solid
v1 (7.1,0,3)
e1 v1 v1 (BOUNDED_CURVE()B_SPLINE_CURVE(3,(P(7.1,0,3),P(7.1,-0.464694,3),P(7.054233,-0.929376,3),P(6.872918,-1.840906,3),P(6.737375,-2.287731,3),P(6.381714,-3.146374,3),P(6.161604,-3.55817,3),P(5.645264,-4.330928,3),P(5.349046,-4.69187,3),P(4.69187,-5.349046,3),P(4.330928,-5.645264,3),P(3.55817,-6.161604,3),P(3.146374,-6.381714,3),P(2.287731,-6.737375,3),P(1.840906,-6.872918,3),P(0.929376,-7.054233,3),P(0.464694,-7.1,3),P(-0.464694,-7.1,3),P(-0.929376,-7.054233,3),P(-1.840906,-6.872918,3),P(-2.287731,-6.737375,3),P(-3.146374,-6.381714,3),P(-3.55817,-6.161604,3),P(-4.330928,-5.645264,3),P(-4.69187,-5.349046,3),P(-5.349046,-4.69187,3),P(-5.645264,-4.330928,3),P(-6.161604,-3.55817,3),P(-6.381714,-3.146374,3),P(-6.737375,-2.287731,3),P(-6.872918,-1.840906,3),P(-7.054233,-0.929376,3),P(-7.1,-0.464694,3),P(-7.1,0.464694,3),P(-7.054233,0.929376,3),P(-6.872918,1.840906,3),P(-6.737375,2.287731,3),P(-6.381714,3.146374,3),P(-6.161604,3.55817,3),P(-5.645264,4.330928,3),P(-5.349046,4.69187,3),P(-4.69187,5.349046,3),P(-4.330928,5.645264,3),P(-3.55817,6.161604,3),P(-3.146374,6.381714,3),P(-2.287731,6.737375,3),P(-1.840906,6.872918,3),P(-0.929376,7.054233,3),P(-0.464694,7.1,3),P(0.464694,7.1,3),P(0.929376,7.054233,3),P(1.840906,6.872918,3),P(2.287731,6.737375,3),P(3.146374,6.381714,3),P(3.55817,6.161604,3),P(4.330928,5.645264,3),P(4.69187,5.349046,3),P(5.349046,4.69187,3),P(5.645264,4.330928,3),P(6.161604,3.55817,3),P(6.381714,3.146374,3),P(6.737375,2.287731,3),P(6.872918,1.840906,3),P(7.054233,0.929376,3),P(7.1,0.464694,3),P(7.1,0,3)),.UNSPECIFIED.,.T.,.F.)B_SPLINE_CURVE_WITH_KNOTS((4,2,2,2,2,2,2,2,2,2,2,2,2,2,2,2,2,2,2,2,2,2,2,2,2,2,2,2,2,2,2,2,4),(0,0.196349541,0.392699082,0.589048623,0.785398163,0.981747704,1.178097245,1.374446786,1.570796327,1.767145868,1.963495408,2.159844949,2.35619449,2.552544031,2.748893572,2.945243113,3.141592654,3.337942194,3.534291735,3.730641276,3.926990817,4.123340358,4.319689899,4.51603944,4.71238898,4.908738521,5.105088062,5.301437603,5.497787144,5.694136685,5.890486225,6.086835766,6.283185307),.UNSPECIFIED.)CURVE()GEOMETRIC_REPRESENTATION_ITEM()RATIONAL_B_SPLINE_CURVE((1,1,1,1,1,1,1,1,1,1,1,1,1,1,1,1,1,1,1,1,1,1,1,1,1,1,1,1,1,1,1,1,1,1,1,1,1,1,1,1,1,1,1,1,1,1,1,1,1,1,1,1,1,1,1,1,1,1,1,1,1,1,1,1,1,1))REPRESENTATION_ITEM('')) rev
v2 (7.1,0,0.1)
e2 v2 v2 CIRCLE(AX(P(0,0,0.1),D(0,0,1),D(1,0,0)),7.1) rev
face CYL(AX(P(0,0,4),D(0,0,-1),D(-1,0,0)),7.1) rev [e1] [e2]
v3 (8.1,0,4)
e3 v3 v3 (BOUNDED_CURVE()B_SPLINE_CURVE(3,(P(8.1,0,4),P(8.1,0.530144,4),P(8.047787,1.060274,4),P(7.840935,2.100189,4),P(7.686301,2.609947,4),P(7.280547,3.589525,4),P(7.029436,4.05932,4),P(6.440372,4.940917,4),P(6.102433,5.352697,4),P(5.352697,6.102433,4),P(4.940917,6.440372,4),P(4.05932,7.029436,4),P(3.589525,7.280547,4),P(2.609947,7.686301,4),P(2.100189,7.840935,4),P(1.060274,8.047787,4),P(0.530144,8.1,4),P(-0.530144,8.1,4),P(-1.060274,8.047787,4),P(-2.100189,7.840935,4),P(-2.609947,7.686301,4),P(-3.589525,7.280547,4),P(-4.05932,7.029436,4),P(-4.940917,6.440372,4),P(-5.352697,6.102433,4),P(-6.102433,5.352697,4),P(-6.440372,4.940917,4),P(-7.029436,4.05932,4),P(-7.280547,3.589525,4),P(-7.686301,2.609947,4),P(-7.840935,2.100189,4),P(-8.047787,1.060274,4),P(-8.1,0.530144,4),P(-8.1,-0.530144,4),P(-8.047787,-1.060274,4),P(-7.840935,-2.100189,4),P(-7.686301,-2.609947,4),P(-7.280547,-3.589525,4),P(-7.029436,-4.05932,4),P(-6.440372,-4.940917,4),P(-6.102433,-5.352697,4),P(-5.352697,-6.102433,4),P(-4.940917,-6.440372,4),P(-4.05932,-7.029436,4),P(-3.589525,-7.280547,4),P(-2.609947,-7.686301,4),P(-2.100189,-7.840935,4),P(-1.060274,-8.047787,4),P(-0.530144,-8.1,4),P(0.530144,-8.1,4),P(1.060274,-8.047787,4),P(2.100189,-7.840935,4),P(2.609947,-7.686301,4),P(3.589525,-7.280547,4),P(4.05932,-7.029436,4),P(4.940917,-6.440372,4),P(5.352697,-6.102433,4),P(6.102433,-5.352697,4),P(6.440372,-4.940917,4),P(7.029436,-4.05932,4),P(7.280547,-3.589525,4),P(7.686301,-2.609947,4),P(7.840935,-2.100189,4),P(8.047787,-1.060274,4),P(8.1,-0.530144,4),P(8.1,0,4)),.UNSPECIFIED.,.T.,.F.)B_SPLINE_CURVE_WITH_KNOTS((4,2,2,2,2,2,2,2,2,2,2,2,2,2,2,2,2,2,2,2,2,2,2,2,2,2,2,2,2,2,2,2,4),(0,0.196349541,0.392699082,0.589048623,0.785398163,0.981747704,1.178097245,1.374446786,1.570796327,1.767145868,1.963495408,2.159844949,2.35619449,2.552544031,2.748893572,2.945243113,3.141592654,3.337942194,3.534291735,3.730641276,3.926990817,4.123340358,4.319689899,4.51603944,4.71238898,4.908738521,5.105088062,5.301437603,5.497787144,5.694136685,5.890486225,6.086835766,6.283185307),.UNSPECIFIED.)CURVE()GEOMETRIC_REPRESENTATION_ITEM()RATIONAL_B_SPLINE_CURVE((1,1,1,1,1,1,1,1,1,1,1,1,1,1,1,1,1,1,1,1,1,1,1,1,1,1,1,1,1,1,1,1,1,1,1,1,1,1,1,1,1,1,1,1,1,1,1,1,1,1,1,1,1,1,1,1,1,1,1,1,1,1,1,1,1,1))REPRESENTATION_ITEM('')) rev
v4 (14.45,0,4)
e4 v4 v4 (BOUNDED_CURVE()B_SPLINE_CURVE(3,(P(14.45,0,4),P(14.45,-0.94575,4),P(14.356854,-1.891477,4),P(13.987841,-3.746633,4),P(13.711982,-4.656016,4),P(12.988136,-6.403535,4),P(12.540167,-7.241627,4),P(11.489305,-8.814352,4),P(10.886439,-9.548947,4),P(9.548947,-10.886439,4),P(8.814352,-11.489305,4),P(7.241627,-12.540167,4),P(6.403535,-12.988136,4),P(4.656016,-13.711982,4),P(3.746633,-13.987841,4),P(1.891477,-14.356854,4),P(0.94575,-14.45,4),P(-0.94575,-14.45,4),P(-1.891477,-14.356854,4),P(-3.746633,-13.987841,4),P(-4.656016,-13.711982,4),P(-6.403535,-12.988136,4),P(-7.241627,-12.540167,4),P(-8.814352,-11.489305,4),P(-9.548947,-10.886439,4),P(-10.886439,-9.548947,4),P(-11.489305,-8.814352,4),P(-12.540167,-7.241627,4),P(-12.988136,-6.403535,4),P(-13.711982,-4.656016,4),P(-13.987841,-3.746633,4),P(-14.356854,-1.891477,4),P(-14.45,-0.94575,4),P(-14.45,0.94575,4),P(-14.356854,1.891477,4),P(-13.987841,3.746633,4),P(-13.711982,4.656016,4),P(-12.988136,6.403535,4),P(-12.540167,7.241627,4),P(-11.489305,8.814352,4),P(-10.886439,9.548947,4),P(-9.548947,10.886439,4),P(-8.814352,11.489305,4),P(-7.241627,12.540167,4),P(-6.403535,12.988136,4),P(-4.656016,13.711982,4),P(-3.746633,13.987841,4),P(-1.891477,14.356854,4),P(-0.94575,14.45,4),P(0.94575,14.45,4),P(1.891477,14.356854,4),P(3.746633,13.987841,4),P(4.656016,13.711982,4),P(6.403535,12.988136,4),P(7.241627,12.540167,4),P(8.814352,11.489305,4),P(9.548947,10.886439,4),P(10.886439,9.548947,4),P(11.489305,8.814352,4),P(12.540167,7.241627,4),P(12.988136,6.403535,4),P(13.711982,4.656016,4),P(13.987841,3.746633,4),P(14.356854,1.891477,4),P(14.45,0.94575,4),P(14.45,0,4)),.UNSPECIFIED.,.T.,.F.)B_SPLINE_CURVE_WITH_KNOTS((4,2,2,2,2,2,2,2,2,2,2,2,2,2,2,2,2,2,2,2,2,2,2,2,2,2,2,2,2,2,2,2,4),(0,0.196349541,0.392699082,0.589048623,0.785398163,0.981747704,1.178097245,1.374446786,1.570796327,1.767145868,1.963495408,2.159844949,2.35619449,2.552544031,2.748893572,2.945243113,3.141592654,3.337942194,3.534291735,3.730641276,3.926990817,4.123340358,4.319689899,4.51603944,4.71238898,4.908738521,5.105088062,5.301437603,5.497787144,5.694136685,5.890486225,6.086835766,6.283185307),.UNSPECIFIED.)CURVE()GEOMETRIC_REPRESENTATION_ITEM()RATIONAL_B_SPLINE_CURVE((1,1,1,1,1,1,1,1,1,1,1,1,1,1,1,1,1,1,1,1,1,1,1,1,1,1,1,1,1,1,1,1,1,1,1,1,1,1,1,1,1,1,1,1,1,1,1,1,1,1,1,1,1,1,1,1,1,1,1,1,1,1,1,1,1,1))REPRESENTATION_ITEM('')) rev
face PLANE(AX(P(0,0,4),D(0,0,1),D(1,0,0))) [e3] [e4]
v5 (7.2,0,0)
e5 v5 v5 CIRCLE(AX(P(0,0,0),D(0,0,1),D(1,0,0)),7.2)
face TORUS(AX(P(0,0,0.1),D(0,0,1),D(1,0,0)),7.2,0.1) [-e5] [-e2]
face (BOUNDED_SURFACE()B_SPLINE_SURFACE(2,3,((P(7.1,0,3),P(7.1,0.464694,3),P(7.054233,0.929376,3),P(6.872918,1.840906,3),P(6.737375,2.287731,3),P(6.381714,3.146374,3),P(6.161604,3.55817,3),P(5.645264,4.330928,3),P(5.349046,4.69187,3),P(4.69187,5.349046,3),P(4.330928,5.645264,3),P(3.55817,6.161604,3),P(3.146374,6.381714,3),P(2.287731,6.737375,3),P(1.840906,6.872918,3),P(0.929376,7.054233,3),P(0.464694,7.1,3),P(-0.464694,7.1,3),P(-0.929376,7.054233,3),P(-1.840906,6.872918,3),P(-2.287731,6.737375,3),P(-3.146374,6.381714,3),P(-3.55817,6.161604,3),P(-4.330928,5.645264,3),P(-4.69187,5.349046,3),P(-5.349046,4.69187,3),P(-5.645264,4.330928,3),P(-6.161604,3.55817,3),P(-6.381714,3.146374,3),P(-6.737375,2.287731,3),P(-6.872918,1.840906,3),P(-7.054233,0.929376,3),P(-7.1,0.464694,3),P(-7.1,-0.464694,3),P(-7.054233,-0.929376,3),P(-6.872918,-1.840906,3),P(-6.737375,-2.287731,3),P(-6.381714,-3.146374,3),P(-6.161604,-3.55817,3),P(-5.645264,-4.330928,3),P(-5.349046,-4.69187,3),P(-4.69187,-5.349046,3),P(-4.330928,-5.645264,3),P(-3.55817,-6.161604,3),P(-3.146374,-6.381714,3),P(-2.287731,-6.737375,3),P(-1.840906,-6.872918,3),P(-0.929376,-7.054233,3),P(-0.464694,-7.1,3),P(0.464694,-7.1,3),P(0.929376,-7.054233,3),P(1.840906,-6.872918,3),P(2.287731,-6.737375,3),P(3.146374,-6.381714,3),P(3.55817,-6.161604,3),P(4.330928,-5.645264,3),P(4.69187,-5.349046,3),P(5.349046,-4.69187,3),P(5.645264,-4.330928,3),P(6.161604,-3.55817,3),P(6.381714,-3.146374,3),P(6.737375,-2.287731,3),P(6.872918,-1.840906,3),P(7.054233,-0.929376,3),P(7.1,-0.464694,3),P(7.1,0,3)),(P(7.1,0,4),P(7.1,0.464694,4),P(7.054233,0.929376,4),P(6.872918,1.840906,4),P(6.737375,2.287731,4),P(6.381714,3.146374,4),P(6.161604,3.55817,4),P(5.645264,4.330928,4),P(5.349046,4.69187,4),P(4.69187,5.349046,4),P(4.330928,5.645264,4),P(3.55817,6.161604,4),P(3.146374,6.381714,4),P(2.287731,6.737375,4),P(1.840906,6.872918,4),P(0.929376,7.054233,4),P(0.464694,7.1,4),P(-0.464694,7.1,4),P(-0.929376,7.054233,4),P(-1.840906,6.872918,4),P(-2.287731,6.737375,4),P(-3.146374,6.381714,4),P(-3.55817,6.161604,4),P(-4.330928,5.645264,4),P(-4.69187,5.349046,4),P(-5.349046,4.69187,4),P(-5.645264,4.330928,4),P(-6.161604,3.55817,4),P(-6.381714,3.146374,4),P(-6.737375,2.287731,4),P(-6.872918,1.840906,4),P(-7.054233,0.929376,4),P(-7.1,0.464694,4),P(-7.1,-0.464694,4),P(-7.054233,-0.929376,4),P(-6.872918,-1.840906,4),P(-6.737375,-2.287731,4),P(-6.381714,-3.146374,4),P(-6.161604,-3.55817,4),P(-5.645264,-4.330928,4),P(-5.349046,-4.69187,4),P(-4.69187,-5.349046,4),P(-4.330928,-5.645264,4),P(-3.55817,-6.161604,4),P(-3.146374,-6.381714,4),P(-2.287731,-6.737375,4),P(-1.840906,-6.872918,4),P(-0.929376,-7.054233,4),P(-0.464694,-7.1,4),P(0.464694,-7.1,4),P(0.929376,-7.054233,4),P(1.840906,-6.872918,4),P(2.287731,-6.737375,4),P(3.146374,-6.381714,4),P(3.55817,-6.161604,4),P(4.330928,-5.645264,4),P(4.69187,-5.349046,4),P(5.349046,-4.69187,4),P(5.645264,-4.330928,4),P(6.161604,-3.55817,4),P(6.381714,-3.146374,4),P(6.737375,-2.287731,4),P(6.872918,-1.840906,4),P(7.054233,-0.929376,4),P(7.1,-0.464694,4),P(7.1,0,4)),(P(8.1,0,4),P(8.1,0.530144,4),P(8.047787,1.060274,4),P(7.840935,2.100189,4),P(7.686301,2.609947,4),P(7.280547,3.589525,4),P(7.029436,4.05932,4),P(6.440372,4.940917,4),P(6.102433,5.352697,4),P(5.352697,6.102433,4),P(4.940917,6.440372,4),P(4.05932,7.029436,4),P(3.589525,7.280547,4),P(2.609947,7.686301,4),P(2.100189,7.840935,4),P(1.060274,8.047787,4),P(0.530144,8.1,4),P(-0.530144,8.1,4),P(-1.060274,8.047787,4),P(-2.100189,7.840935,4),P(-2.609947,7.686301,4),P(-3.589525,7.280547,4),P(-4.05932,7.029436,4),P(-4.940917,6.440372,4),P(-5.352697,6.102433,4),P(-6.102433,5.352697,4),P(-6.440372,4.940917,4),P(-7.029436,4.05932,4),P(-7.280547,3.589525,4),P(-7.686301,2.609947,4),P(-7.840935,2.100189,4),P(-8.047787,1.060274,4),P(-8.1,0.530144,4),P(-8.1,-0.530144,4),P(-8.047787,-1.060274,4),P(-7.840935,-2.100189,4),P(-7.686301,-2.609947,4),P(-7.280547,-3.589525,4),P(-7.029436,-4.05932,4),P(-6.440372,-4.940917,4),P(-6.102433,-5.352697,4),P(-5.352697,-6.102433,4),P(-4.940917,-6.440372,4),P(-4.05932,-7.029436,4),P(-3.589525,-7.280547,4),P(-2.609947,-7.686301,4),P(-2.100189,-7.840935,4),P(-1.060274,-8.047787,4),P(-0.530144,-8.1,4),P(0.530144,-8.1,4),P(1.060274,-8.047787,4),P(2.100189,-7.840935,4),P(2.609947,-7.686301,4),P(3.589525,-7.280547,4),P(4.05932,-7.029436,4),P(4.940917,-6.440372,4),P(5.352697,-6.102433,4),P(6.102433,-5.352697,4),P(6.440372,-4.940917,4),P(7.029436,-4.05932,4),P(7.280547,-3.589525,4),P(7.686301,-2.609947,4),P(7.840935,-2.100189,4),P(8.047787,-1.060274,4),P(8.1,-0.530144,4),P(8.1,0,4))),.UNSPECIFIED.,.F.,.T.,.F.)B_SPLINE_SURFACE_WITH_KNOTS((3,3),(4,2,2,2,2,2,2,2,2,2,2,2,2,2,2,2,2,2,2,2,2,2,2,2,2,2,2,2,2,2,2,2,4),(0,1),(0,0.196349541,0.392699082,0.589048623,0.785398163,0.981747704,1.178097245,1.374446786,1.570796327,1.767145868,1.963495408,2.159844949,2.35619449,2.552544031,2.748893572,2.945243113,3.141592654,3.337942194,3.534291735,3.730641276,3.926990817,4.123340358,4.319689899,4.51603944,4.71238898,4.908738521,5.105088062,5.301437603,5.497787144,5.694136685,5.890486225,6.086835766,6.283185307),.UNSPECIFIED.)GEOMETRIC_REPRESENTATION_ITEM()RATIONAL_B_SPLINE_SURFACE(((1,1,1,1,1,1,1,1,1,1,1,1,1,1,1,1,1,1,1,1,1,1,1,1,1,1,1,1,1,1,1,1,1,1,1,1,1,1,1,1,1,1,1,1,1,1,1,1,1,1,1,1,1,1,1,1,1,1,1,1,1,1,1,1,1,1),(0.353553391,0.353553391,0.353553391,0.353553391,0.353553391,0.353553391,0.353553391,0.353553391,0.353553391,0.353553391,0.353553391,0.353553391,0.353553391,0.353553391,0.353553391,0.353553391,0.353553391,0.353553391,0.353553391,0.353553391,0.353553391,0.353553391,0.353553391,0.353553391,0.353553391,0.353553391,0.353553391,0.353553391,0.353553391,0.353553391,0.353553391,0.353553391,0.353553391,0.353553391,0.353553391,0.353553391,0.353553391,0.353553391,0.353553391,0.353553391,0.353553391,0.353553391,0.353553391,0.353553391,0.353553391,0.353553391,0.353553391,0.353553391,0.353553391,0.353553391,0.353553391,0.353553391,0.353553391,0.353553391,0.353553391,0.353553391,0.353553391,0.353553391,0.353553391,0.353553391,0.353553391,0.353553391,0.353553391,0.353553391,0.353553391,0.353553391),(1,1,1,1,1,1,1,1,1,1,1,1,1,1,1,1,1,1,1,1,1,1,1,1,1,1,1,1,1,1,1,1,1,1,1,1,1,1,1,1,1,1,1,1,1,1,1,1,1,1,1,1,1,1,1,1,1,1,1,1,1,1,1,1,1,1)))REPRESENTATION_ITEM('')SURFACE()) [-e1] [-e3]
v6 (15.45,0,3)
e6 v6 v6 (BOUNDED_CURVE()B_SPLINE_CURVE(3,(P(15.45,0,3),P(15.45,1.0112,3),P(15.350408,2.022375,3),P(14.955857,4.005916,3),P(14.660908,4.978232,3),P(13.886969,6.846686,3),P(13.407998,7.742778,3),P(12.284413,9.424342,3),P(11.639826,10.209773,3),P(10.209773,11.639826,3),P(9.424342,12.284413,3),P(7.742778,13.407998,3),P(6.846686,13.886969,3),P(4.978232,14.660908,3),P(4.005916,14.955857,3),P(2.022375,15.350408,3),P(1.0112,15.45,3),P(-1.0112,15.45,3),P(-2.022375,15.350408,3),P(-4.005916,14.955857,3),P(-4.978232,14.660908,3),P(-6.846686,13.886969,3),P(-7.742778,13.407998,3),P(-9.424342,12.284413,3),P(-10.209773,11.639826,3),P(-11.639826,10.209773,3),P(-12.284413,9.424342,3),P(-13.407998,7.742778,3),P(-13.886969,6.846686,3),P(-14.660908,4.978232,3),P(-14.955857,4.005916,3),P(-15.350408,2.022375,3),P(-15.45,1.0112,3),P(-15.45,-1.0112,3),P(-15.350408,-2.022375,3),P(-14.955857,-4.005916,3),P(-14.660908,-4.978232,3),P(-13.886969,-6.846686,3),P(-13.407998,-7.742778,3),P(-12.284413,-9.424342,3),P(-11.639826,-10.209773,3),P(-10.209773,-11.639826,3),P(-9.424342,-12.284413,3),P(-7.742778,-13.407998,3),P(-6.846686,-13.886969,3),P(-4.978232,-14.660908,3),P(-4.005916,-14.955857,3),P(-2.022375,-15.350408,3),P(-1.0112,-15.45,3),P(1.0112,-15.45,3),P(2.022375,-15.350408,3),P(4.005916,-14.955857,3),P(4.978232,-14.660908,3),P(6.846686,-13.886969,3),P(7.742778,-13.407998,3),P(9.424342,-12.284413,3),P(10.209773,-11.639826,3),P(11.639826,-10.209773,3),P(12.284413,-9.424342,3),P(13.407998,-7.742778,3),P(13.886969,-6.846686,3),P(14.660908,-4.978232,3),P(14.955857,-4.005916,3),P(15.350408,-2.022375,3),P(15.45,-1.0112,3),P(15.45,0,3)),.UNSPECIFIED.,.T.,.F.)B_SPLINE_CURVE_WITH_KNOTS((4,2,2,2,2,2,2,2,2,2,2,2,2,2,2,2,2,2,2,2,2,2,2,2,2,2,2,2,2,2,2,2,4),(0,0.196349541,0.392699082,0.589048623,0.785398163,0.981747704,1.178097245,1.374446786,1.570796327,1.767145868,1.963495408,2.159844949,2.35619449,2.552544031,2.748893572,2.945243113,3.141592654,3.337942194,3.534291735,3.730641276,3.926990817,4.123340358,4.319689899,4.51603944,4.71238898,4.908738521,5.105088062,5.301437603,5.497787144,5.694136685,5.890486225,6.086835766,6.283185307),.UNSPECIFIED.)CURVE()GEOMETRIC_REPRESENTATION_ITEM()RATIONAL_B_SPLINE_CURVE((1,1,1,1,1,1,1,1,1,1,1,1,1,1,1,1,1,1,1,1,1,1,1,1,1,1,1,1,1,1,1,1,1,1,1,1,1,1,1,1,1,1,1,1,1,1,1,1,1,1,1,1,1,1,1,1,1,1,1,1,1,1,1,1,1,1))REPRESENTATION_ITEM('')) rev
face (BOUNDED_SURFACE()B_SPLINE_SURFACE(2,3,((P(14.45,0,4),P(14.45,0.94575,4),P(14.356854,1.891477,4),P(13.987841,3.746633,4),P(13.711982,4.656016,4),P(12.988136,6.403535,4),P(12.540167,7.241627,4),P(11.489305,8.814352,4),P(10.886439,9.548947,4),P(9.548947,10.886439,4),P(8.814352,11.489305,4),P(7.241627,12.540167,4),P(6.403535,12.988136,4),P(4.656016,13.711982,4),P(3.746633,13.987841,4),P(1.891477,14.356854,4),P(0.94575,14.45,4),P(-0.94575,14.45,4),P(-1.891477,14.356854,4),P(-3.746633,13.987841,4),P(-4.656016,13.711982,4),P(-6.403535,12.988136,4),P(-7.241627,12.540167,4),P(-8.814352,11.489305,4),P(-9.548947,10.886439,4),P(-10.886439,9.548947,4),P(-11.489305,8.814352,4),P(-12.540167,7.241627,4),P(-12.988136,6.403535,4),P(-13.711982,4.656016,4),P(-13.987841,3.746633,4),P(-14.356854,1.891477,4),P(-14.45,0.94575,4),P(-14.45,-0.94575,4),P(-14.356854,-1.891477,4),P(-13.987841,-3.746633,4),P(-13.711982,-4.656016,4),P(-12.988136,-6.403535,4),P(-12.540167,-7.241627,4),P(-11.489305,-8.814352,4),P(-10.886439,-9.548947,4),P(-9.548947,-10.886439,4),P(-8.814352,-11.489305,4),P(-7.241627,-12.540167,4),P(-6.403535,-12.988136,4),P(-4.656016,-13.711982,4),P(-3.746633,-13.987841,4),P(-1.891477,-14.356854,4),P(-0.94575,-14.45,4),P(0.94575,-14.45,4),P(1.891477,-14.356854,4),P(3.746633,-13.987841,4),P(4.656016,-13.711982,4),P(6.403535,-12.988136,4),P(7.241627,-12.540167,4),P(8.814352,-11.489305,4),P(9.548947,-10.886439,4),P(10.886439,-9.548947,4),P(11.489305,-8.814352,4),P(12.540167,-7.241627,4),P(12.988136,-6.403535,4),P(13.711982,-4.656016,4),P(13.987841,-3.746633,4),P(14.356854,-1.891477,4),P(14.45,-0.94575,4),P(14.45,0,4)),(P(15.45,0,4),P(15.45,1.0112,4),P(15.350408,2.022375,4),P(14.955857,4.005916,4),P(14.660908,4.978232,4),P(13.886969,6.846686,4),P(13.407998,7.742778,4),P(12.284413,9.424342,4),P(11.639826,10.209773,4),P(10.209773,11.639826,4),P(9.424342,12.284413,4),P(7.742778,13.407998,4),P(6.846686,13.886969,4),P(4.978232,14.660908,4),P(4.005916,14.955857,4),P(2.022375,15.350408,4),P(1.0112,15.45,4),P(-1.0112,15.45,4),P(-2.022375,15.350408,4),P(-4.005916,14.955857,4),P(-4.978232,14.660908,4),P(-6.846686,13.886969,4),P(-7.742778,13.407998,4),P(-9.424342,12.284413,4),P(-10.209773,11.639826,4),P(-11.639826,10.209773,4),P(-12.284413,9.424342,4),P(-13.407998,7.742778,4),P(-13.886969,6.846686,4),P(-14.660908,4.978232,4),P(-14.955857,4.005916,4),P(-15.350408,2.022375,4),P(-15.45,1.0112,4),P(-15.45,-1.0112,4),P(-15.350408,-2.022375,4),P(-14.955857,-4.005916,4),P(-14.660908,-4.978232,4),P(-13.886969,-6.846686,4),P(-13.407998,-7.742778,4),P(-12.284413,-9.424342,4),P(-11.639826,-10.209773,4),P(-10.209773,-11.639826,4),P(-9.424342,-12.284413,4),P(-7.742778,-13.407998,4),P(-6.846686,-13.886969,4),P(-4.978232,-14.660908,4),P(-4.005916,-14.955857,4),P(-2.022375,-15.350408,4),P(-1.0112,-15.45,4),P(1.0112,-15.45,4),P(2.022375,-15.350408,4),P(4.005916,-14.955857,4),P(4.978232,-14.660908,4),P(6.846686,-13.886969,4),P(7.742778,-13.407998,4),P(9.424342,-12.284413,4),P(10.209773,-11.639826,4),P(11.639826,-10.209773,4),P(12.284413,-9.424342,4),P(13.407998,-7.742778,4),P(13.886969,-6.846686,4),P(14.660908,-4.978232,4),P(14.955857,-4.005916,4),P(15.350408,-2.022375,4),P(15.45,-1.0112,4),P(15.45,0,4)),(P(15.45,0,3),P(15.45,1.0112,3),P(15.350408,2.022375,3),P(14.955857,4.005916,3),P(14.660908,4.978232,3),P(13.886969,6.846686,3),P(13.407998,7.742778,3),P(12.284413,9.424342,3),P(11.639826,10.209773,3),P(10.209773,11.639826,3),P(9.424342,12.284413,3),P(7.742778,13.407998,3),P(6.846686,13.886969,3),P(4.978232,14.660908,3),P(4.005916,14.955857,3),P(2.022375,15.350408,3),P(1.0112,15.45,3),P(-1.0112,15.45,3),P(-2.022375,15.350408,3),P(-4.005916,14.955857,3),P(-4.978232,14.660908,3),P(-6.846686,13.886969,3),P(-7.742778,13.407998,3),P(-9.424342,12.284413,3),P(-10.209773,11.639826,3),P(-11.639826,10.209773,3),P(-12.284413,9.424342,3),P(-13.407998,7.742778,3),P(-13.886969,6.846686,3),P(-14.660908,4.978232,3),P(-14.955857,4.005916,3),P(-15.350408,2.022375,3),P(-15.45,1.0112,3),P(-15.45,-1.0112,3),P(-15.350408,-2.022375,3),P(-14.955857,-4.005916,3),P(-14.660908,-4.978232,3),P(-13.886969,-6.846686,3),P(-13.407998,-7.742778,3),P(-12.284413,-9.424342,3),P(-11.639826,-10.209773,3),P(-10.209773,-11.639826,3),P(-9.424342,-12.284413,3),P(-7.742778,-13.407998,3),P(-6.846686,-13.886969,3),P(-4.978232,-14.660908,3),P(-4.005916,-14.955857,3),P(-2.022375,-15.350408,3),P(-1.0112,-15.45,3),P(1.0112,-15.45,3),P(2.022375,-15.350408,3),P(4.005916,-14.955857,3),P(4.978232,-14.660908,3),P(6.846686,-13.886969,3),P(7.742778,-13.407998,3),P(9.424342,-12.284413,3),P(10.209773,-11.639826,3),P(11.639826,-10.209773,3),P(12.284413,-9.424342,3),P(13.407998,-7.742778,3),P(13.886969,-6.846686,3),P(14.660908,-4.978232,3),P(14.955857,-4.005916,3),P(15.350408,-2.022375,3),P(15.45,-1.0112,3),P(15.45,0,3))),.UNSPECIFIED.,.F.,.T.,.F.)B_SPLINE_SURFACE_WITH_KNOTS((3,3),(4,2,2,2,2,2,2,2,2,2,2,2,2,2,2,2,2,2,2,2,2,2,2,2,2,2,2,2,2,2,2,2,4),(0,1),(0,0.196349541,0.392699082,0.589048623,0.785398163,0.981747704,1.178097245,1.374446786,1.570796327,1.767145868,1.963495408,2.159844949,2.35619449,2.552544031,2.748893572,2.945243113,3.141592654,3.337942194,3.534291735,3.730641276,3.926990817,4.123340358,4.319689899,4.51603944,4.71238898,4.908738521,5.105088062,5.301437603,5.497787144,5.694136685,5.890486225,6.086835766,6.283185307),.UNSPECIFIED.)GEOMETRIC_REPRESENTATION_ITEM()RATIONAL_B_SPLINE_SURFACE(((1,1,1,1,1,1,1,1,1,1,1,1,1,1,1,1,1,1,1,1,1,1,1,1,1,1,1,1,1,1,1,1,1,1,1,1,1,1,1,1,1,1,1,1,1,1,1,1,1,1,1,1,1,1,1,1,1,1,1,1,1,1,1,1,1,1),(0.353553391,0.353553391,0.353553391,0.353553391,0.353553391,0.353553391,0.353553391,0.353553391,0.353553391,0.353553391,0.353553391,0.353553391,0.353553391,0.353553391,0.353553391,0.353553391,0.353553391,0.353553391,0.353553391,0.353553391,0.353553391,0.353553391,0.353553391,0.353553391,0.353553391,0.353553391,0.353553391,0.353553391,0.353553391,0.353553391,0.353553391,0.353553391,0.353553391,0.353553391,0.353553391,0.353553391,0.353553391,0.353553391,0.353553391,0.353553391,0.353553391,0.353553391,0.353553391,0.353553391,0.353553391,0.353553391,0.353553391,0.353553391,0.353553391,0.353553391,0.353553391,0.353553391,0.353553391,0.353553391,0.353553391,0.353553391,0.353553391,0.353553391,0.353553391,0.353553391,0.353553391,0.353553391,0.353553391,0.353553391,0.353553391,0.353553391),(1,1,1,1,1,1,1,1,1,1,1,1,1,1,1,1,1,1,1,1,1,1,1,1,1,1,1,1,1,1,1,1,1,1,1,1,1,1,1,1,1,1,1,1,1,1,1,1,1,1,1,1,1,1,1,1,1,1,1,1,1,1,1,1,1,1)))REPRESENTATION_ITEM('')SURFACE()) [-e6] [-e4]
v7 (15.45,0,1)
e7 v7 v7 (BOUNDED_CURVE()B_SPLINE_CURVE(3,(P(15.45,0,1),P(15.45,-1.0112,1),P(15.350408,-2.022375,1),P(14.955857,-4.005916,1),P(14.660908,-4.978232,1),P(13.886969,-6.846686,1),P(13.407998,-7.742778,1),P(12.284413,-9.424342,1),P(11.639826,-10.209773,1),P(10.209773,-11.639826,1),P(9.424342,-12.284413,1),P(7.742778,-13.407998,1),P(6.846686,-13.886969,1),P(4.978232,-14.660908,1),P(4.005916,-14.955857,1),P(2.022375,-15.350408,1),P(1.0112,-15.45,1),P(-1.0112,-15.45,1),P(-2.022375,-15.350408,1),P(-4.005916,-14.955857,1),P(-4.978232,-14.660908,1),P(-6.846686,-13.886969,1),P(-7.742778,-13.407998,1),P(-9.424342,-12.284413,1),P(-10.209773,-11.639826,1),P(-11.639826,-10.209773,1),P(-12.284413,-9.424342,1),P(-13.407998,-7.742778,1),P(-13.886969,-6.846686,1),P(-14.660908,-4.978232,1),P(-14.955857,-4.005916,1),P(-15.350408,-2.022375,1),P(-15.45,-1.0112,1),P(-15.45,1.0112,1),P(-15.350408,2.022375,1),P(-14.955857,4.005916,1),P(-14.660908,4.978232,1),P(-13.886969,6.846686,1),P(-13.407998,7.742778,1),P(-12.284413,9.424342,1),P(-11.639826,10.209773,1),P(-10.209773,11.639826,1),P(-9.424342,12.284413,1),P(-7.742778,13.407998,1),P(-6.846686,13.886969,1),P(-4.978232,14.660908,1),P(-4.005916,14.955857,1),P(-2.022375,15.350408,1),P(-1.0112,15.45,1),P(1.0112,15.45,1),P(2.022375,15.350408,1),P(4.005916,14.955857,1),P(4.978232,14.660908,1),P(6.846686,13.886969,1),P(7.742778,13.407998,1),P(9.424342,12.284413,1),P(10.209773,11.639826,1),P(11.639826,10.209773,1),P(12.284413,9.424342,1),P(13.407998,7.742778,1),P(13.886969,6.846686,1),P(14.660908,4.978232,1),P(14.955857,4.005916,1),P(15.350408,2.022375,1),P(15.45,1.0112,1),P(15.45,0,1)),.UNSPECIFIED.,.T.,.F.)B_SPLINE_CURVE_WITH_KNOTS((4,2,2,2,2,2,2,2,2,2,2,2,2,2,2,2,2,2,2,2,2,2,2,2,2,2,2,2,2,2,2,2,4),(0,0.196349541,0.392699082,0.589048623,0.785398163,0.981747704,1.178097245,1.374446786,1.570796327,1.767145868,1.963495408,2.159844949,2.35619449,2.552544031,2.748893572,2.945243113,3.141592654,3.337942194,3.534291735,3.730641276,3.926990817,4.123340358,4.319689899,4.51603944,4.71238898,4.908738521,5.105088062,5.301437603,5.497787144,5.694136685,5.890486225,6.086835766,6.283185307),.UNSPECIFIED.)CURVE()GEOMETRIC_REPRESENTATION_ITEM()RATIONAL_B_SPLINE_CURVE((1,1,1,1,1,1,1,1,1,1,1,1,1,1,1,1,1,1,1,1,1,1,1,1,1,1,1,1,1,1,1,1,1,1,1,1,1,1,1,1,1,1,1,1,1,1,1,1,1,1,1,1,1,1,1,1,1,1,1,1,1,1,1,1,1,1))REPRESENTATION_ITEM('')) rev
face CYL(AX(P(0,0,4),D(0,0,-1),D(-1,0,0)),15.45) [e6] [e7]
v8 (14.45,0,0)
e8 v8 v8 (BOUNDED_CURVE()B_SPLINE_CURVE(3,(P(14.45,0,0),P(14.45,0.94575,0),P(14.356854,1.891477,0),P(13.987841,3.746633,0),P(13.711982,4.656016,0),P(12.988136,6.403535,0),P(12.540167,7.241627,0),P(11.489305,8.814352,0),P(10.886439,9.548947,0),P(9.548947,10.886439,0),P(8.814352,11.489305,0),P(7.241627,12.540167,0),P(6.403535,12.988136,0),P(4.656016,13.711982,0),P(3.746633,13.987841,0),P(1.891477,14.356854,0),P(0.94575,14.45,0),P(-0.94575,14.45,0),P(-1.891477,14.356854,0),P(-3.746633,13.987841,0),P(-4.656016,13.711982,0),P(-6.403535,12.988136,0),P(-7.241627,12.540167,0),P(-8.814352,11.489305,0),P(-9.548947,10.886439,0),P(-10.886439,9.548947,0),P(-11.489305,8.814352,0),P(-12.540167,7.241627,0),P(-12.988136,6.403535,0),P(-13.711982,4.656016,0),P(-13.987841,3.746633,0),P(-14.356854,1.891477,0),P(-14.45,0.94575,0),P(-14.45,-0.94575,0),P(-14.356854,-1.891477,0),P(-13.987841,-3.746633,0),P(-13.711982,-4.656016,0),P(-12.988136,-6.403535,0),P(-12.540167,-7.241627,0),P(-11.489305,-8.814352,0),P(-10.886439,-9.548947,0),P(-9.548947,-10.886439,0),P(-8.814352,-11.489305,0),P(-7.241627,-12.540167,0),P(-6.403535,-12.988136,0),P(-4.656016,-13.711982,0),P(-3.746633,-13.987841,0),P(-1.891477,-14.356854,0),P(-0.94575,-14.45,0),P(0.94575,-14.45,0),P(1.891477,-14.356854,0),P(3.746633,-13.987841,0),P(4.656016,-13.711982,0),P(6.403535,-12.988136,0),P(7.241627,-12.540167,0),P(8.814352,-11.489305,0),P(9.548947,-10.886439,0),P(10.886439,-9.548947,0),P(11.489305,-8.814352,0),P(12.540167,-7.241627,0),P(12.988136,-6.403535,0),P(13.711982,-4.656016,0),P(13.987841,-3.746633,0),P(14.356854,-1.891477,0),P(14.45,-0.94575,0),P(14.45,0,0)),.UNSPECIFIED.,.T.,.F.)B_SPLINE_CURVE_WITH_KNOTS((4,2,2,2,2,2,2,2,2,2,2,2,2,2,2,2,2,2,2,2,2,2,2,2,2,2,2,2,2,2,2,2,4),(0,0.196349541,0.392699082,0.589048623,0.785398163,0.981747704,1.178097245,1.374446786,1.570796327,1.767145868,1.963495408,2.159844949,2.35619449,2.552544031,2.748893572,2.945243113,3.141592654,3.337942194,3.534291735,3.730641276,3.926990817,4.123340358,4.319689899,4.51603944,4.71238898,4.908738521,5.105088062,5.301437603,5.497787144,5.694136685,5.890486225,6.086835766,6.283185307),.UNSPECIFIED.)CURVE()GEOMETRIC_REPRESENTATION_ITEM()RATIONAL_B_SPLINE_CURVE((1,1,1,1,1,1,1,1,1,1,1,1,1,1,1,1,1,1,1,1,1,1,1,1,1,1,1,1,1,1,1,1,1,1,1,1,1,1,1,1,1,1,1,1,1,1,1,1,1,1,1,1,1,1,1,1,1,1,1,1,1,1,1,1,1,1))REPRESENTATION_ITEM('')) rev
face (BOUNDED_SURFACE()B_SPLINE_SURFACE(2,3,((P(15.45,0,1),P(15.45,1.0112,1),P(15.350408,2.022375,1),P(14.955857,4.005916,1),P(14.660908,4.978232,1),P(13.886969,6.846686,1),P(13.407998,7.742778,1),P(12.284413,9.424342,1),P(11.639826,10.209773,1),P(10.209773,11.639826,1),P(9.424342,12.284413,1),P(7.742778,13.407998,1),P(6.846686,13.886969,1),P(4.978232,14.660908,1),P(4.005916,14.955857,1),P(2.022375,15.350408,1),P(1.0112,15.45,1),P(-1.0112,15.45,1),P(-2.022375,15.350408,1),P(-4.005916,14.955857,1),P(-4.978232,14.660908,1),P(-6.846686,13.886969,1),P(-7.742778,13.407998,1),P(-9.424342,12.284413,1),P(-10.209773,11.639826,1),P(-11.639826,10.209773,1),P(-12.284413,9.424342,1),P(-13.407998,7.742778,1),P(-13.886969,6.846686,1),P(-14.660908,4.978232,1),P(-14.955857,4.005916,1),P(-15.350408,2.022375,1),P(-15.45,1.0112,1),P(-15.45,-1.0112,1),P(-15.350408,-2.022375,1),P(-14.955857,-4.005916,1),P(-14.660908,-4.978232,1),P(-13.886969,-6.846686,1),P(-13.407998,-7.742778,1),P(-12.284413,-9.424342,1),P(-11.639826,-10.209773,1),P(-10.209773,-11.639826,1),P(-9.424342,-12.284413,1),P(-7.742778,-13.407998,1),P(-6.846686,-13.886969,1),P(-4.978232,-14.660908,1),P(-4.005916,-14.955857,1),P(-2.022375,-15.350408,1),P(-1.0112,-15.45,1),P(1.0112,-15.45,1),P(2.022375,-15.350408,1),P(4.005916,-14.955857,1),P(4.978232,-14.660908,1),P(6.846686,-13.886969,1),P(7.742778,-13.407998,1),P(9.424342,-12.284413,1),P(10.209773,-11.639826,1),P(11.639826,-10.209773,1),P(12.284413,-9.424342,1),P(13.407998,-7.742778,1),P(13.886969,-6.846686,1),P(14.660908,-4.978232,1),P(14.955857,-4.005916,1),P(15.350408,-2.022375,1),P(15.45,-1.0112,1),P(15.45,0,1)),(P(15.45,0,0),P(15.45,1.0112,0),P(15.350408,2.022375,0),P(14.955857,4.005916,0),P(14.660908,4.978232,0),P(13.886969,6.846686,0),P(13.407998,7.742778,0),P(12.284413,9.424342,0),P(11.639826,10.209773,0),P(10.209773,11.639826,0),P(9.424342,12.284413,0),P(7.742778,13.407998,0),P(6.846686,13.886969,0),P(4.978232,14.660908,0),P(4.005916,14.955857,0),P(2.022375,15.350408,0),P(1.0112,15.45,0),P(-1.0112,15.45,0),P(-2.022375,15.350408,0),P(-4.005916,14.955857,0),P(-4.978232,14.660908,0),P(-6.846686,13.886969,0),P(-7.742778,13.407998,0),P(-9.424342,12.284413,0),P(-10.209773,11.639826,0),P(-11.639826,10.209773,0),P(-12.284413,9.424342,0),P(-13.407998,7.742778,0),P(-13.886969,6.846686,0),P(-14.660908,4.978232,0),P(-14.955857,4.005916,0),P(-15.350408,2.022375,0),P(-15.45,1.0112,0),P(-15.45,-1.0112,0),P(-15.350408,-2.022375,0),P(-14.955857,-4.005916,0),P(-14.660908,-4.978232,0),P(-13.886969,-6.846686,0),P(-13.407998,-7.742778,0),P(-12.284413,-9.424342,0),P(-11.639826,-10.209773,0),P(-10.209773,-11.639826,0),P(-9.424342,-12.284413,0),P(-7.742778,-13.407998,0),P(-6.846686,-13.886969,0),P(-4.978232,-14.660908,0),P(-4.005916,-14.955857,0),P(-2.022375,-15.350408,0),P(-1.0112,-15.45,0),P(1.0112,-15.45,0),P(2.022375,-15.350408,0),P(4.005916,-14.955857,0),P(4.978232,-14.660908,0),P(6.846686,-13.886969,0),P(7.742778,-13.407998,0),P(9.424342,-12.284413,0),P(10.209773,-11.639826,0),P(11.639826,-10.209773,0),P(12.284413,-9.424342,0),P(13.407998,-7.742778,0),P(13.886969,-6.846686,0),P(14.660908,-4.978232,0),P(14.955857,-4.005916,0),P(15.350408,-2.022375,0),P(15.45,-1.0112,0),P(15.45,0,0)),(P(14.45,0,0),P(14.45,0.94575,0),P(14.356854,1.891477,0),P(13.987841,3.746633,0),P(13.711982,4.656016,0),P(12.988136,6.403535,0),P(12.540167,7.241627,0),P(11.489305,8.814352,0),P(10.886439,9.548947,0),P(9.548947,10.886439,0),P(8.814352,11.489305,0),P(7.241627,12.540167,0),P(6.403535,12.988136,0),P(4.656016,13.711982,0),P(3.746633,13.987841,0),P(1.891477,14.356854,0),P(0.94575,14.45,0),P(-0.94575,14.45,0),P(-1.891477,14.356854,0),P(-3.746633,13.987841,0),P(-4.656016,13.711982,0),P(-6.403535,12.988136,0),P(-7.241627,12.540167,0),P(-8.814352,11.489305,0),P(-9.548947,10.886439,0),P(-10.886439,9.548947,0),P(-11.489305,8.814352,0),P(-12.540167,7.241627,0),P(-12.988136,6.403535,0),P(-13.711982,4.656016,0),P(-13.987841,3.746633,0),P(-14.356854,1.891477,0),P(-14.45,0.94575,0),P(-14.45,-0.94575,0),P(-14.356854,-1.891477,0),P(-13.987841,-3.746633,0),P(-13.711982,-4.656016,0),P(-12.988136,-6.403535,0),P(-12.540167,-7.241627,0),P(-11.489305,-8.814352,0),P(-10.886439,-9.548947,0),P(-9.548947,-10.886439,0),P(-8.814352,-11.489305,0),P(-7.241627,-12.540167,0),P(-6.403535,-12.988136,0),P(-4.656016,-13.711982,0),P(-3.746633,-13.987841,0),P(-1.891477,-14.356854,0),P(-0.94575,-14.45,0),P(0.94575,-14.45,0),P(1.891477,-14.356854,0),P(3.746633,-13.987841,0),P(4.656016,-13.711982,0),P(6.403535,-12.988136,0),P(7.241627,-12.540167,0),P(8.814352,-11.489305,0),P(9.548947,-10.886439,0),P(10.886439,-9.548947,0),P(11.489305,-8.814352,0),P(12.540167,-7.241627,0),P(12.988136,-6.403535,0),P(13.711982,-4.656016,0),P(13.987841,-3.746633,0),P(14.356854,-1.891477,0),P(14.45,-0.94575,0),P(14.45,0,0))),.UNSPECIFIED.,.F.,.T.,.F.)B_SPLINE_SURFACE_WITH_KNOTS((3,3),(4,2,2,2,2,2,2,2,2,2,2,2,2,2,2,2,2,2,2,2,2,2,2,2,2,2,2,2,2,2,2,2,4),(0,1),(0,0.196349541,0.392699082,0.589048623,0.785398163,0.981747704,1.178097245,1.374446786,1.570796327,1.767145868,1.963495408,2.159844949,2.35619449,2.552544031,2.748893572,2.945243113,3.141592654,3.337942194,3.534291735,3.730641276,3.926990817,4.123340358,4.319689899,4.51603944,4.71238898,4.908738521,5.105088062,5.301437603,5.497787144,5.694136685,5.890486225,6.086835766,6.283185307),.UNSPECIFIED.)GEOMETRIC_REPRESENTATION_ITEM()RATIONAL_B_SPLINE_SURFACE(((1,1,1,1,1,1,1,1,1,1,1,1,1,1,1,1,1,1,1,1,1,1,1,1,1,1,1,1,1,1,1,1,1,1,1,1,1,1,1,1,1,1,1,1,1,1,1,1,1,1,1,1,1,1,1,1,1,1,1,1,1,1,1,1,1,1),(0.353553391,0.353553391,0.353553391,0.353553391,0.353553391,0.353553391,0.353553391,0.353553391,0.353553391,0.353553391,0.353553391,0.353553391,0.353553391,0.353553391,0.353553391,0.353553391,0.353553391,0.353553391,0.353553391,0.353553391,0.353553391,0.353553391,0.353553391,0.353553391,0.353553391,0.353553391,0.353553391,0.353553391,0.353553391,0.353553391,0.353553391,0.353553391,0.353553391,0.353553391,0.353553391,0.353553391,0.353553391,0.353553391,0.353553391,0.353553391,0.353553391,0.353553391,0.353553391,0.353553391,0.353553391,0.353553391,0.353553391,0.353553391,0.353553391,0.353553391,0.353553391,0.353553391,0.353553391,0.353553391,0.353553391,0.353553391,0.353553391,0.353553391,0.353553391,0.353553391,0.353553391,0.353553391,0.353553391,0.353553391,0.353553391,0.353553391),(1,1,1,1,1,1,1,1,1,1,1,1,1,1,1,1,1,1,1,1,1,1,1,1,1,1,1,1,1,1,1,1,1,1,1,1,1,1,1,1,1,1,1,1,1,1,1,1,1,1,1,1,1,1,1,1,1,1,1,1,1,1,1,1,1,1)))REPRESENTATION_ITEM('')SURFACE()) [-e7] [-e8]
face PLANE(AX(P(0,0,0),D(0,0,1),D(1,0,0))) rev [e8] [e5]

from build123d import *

# Parameters (mm, degrees)
CROQUIS2_R              = 15.45
CROQUIS2_R_2            = 7.1
SALIENTE_EXTRUIR1_DEPTH = 4
REDONDEO1_SIZE          = 1
REDONDEO2_R             = 0.1


with BuildPart() as part:
    # Croquis2 → Saliente-Extruir1 (new body)
    with BuildSketch(Plane(origin=(0, 0, 0), x_dir=(0, 1, 0), z_dir=(0, 0, 1))):
        with Locations(Location((0, 0, 0), (0, 0, 270))):
            Circle(CROQUIS2_R)
        with Locations(Location((0, 0, 0), (0, 0, 270))):
            Circle(CROQUIS2_R_2, mode=Mode.SUBTRACT)
    extrude(amount=SALIENTE_EXTRUIR1_DEPTH)

    # Redondeo1
    # a fillet whose section is not a circle: 1 mm, written as the material it takes off along each edge
    with BuildSketch(Plane(origin=(0, 0, 0), x_dir=(1, 0, 0), z_dir=(0, -1, 0))) as redondeo1_piece_1:
        with BuildLine():
            Bezier((15.45, REDONDEO1_SIZE), (15.45, 0), (15.45 - REDONDEO1_SIZE, 0), weights=[1, 0.353553391, 1])
            Line((15.45 - REDONDEO1_SIZE, 0), (15.45, 0))
            Line((15.45, 0), (15.45, REDONDEO1_SIZE))
        make_face()
    revolve(axis=Axis((0, 0, 0), (0, 0, 1)), mode=Mode.SUBTRACT)
    with BuildSketch(Plane(origin=(0, 0, 4), x_dir=(1, 0, 0), z_dir=(0, -1, 0))) as redondeo1_piece_2:
        with BuildLine():
            Bezier((15.45, -REDONDEO1_SIZE), (15.45, 0), (15.45 - REDONDEO1_SIZE, 0), weights=[1, 0.353553391, 1])
            Line((15.45 - REDONDEO1_SIZE, 0), (15.45, 0))
            Line((15.45, 0), (15.45, -REDONDEO1_SIZE))
        make_face()
    revolve(axis=Axis((0, 0, 4), (0, 0, 1)), mode=Mode.SUBTRACT)
    with BuildSketch(Plane(origin=(0, 0, 4), x_dir=(1, 0, 0), z_dir=(0, -1, 0))) as redondeo1_piece_3:
        with BuildLine():
            Bezier((7.1, -REDONDEO1_SIZE), (7.1, 0), (7.1 + REDONDEO1_SIZE, 0), weights=[1, 0.353553391, 1])
            Line((7.1 + REDONDEO1_SIZE, 0), (7.1, 0))
            Line((7.1, 0), (7.1, -REDONDEO1_SIZE))
        make_face()
    revolve(axis=Axis((0, 0, 4), (0, 0, 1)), mode=Mode.SUBTRACT)

    # Redondeo2
    redondeo2_edges = [part.edges().sort_by_distance(p)[0] for p in [
        (-7.1, 0, 0),
    ]]
    fillet(redondeo2_edges, radius=REDONDEO2_R)


solid = part.part
